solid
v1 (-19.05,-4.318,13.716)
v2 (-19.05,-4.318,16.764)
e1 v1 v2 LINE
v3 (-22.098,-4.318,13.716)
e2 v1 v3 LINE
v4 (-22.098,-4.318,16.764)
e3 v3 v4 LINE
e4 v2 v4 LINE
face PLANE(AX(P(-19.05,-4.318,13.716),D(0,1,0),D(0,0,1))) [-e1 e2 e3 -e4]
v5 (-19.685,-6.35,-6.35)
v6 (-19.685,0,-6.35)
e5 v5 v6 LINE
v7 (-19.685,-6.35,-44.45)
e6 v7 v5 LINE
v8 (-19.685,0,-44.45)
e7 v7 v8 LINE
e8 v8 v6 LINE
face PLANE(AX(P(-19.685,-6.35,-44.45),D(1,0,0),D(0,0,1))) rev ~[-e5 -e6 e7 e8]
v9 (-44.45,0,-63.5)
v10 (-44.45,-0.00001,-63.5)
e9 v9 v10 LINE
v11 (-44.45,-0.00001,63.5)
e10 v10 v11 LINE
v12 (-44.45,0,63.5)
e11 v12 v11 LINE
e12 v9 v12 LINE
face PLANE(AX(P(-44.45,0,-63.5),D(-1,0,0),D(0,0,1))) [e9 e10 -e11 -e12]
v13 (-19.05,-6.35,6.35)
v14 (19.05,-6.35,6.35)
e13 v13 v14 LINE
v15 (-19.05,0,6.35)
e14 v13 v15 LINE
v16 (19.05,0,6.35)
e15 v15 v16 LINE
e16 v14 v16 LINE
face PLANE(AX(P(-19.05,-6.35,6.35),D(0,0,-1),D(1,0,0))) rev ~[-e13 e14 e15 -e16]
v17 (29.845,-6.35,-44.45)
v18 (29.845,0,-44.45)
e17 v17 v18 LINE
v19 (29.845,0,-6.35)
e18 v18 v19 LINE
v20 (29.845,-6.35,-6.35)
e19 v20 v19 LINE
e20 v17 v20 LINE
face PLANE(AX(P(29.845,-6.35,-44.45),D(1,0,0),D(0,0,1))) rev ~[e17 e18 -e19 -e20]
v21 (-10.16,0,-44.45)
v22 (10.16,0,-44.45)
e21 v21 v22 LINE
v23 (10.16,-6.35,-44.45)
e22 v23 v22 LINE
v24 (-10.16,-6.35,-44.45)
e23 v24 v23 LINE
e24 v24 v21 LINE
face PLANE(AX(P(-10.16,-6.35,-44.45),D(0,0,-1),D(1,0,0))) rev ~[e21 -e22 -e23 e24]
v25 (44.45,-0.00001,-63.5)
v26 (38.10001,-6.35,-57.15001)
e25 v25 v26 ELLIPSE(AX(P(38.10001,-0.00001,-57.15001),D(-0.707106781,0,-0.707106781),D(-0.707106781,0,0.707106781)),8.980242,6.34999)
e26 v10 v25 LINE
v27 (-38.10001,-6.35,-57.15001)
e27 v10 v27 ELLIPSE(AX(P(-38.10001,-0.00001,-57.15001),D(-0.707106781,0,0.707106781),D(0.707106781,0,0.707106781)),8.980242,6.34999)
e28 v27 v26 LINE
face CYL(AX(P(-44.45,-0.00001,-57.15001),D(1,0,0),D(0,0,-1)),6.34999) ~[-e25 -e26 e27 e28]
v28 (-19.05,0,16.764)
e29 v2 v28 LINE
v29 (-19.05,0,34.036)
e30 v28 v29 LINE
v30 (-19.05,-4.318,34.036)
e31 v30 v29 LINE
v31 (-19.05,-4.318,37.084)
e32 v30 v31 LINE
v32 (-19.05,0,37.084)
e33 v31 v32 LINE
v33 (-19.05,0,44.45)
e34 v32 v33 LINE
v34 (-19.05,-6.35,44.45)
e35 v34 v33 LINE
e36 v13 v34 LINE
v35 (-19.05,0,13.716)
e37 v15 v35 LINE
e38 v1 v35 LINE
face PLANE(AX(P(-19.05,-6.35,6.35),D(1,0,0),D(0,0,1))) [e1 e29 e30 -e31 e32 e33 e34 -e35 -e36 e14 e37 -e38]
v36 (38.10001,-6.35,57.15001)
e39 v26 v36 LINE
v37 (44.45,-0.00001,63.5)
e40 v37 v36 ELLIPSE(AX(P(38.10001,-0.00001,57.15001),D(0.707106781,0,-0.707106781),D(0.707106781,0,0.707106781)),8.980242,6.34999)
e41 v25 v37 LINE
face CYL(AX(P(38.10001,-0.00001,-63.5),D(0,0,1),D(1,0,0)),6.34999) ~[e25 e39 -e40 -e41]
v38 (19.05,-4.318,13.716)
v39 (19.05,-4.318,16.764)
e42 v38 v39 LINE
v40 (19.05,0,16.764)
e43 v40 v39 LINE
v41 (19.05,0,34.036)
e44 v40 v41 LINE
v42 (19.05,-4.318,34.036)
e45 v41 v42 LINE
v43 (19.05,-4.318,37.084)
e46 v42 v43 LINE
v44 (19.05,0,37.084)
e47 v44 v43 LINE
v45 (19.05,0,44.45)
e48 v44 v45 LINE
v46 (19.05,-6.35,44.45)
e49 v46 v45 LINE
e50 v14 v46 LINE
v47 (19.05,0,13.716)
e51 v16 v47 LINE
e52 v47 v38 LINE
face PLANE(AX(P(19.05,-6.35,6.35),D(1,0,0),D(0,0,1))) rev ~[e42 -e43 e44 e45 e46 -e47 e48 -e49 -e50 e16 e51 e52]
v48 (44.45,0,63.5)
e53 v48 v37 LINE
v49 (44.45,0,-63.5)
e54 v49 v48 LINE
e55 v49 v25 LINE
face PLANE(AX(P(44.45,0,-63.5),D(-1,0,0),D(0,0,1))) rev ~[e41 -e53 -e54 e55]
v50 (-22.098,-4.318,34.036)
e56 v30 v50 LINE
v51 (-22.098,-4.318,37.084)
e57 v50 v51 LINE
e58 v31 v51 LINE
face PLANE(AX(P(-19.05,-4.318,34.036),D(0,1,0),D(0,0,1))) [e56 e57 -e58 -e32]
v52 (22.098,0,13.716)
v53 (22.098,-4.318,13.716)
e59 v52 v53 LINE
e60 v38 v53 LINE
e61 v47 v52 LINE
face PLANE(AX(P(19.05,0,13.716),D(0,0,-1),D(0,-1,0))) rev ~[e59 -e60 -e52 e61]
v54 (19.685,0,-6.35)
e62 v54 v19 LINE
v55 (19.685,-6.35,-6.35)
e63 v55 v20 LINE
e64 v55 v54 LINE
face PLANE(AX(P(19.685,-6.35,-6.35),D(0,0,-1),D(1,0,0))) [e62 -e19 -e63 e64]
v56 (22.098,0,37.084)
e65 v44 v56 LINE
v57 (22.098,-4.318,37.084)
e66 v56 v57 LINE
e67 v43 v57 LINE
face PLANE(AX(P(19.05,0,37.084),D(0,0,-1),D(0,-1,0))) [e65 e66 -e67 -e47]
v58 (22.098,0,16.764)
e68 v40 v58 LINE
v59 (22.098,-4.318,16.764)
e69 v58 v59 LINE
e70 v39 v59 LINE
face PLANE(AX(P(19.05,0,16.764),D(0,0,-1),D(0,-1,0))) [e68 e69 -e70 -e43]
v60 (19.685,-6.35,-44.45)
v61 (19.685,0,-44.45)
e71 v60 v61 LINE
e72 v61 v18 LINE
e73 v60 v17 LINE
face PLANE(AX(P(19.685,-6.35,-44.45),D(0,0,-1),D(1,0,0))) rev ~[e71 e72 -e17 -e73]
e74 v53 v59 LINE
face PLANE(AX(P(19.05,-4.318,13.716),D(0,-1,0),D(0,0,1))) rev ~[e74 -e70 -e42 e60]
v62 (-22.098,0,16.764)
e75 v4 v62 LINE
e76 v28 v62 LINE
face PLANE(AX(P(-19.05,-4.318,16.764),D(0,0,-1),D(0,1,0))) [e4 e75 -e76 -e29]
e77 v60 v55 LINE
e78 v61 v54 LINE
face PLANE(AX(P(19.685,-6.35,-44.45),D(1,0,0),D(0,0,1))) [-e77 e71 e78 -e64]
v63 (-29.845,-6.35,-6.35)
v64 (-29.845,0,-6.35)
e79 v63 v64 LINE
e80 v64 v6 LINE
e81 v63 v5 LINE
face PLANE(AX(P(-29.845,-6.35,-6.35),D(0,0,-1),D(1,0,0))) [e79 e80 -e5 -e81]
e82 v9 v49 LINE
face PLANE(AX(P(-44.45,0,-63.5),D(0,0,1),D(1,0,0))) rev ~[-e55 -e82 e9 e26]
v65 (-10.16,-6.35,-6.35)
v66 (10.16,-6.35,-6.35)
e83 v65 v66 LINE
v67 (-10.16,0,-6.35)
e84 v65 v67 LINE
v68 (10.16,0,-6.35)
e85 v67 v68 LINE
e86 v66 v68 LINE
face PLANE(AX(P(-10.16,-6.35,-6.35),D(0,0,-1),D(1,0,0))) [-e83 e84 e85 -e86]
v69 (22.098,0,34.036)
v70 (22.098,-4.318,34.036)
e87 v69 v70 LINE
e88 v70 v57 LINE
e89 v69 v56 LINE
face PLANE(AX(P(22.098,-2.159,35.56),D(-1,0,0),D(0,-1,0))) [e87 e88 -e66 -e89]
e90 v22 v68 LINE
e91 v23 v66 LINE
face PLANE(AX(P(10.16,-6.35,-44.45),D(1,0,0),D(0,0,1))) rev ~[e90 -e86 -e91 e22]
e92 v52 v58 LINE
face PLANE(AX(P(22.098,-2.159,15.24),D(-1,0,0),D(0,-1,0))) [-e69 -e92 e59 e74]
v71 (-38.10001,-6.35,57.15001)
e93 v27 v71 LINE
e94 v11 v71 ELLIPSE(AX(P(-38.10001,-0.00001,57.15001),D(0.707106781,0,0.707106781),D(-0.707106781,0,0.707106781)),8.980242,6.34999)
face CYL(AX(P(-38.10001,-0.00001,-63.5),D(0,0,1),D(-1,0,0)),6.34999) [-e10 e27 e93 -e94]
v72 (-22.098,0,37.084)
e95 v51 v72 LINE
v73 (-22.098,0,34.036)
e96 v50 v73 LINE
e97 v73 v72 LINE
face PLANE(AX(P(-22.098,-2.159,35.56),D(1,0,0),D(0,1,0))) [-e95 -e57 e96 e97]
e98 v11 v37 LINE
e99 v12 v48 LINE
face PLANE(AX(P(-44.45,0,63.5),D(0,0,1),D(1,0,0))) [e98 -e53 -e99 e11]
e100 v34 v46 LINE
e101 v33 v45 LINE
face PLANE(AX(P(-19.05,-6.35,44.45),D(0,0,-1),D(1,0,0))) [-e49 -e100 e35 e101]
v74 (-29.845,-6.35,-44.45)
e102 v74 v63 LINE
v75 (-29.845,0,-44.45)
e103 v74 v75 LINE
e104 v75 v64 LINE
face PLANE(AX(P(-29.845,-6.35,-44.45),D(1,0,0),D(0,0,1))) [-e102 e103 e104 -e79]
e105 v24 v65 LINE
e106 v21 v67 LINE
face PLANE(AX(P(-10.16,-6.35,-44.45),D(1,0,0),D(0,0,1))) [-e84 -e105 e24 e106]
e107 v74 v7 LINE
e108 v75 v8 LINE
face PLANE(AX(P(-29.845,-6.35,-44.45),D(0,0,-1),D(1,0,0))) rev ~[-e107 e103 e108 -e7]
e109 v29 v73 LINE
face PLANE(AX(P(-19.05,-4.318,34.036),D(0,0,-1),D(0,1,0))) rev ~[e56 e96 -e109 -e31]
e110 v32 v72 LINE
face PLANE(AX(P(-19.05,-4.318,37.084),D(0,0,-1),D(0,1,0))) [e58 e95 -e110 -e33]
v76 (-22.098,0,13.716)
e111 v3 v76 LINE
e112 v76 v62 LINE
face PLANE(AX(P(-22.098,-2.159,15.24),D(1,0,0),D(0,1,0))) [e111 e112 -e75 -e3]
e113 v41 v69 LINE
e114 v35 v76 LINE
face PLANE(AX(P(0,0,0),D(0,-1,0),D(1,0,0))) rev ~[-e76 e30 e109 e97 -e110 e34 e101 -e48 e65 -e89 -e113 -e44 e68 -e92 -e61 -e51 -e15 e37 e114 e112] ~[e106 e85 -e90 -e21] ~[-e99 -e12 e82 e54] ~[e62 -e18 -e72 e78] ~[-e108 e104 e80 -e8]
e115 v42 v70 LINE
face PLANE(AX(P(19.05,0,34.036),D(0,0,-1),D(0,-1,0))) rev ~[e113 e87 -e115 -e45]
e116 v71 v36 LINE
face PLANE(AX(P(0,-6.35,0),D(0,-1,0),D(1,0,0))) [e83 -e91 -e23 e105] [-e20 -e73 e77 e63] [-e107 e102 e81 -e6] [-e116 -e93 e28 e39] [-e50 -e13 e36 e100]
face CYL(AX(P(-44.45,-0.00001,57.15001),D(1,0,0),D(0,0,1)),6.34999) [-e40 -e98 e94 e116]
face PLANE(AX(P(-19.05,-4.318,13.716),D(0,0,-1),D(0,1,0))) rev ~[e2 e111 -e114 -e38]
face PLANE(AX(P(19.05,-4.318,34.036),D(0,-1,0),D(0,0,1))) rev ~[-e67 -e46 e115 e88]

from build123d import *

# Parameters (mm, degrees)
F0_W      = 88.9
F0_H      = 127
F1_DEPTH  = 6.35
F2_R      = 6.34999
F3_W      = 38.1
F3_H      = 38.1
F4_DEPTH  = 6.351
F5_W      = 20.32
F5_H      = 38.1
F5_W_2    = 10.16
F6_DEPTH  = 6.351
F7_W      = 4.318
F7_H      = 3.048
F8_DEPTH  = 3.048
F9_W      = 4.318
F9_H      = 3.048
F10_DEPTH = 3.048


# Not quite as in the source:
# - a fillet or chamfer is up to 0.001 mm smaller than in the source, because OpenCascade refuses the exact size


with BuildPart() as f1:
    # F0 (on Front) → F1 (new body)
    with BuildSketch(Plane.XZ):
        Rectangle(F0_W, F0_H)
    extrude(amount=F1_DEPTH)

    # F2 (radius 6.35 in the source; OpenCascade refuses exactly that, so slightly less here)
    f2_edges = [f1.edges().sort_by_distance(p)[0] for p in [
        (-44.45, -6.35, 0),
        (0, -6.35, 63.5),
        (44.45, -6.35, 0),
        (0, -6.35, -63.5),
    ]]
    fillet(f2_edges, radius=F2_R)

    # F3 (on face) → F4 (cut, through all)
    with BuildSketch(Plane.XZ.offset(6.35)):
        with Locations((0, 25.4)):
            Rectangle(F3_W, F3_H)
    extrude(amount=-F4_DEPTH, mode=Mode.SUBTRACT)

    # F5 (on face) → F6 (cut, through all)
    with BuildSketch(Plane.XZ.offset(6.35)):
        with Locations((0, -25.4)):
            Rectangle(F5_W, F5_H)
        with Locations((-24.765, -25.4)):
            Rectangle(F5_W_2, F5_H)
        with Locations((24.765, -25.4)):
            Rectangle(F5_W_2, F5_H)
    extrude(amount=-F6_DEPTH, mode=Mode.SUBTRACT)

    # F7 (on face) → F8 (cut)
    with BuildSketch(Plane.YZ.offset(-19.05)):
        with Locations((-2.159, 35.56)):
            Rectangle(F7_W, F7_H)
        with Locations((-2.159, 15.24)):
            Rectangle(F7_W, F7_H)
    extrude(amount=-F8_DEPTH, mode=Mode.SUBTRACT)

    # F9 (on face) → F10 (cut)
    with BuildSketch(Plane(origin=(19.05, 0, 0), x_dir=(0, -1, 0), z_dir=(-1, 0, 0))):
        with Locations((2.159, 15.24)):
            Rectangle(F9_W, F9_H)
        with Locations((2.159, 35.56)):
            Rectangle(F9_W, F9_H)
    extrude(amount=-F10_DEPTH, mode=Mode.SUBTRACT)


solid = f1.part
